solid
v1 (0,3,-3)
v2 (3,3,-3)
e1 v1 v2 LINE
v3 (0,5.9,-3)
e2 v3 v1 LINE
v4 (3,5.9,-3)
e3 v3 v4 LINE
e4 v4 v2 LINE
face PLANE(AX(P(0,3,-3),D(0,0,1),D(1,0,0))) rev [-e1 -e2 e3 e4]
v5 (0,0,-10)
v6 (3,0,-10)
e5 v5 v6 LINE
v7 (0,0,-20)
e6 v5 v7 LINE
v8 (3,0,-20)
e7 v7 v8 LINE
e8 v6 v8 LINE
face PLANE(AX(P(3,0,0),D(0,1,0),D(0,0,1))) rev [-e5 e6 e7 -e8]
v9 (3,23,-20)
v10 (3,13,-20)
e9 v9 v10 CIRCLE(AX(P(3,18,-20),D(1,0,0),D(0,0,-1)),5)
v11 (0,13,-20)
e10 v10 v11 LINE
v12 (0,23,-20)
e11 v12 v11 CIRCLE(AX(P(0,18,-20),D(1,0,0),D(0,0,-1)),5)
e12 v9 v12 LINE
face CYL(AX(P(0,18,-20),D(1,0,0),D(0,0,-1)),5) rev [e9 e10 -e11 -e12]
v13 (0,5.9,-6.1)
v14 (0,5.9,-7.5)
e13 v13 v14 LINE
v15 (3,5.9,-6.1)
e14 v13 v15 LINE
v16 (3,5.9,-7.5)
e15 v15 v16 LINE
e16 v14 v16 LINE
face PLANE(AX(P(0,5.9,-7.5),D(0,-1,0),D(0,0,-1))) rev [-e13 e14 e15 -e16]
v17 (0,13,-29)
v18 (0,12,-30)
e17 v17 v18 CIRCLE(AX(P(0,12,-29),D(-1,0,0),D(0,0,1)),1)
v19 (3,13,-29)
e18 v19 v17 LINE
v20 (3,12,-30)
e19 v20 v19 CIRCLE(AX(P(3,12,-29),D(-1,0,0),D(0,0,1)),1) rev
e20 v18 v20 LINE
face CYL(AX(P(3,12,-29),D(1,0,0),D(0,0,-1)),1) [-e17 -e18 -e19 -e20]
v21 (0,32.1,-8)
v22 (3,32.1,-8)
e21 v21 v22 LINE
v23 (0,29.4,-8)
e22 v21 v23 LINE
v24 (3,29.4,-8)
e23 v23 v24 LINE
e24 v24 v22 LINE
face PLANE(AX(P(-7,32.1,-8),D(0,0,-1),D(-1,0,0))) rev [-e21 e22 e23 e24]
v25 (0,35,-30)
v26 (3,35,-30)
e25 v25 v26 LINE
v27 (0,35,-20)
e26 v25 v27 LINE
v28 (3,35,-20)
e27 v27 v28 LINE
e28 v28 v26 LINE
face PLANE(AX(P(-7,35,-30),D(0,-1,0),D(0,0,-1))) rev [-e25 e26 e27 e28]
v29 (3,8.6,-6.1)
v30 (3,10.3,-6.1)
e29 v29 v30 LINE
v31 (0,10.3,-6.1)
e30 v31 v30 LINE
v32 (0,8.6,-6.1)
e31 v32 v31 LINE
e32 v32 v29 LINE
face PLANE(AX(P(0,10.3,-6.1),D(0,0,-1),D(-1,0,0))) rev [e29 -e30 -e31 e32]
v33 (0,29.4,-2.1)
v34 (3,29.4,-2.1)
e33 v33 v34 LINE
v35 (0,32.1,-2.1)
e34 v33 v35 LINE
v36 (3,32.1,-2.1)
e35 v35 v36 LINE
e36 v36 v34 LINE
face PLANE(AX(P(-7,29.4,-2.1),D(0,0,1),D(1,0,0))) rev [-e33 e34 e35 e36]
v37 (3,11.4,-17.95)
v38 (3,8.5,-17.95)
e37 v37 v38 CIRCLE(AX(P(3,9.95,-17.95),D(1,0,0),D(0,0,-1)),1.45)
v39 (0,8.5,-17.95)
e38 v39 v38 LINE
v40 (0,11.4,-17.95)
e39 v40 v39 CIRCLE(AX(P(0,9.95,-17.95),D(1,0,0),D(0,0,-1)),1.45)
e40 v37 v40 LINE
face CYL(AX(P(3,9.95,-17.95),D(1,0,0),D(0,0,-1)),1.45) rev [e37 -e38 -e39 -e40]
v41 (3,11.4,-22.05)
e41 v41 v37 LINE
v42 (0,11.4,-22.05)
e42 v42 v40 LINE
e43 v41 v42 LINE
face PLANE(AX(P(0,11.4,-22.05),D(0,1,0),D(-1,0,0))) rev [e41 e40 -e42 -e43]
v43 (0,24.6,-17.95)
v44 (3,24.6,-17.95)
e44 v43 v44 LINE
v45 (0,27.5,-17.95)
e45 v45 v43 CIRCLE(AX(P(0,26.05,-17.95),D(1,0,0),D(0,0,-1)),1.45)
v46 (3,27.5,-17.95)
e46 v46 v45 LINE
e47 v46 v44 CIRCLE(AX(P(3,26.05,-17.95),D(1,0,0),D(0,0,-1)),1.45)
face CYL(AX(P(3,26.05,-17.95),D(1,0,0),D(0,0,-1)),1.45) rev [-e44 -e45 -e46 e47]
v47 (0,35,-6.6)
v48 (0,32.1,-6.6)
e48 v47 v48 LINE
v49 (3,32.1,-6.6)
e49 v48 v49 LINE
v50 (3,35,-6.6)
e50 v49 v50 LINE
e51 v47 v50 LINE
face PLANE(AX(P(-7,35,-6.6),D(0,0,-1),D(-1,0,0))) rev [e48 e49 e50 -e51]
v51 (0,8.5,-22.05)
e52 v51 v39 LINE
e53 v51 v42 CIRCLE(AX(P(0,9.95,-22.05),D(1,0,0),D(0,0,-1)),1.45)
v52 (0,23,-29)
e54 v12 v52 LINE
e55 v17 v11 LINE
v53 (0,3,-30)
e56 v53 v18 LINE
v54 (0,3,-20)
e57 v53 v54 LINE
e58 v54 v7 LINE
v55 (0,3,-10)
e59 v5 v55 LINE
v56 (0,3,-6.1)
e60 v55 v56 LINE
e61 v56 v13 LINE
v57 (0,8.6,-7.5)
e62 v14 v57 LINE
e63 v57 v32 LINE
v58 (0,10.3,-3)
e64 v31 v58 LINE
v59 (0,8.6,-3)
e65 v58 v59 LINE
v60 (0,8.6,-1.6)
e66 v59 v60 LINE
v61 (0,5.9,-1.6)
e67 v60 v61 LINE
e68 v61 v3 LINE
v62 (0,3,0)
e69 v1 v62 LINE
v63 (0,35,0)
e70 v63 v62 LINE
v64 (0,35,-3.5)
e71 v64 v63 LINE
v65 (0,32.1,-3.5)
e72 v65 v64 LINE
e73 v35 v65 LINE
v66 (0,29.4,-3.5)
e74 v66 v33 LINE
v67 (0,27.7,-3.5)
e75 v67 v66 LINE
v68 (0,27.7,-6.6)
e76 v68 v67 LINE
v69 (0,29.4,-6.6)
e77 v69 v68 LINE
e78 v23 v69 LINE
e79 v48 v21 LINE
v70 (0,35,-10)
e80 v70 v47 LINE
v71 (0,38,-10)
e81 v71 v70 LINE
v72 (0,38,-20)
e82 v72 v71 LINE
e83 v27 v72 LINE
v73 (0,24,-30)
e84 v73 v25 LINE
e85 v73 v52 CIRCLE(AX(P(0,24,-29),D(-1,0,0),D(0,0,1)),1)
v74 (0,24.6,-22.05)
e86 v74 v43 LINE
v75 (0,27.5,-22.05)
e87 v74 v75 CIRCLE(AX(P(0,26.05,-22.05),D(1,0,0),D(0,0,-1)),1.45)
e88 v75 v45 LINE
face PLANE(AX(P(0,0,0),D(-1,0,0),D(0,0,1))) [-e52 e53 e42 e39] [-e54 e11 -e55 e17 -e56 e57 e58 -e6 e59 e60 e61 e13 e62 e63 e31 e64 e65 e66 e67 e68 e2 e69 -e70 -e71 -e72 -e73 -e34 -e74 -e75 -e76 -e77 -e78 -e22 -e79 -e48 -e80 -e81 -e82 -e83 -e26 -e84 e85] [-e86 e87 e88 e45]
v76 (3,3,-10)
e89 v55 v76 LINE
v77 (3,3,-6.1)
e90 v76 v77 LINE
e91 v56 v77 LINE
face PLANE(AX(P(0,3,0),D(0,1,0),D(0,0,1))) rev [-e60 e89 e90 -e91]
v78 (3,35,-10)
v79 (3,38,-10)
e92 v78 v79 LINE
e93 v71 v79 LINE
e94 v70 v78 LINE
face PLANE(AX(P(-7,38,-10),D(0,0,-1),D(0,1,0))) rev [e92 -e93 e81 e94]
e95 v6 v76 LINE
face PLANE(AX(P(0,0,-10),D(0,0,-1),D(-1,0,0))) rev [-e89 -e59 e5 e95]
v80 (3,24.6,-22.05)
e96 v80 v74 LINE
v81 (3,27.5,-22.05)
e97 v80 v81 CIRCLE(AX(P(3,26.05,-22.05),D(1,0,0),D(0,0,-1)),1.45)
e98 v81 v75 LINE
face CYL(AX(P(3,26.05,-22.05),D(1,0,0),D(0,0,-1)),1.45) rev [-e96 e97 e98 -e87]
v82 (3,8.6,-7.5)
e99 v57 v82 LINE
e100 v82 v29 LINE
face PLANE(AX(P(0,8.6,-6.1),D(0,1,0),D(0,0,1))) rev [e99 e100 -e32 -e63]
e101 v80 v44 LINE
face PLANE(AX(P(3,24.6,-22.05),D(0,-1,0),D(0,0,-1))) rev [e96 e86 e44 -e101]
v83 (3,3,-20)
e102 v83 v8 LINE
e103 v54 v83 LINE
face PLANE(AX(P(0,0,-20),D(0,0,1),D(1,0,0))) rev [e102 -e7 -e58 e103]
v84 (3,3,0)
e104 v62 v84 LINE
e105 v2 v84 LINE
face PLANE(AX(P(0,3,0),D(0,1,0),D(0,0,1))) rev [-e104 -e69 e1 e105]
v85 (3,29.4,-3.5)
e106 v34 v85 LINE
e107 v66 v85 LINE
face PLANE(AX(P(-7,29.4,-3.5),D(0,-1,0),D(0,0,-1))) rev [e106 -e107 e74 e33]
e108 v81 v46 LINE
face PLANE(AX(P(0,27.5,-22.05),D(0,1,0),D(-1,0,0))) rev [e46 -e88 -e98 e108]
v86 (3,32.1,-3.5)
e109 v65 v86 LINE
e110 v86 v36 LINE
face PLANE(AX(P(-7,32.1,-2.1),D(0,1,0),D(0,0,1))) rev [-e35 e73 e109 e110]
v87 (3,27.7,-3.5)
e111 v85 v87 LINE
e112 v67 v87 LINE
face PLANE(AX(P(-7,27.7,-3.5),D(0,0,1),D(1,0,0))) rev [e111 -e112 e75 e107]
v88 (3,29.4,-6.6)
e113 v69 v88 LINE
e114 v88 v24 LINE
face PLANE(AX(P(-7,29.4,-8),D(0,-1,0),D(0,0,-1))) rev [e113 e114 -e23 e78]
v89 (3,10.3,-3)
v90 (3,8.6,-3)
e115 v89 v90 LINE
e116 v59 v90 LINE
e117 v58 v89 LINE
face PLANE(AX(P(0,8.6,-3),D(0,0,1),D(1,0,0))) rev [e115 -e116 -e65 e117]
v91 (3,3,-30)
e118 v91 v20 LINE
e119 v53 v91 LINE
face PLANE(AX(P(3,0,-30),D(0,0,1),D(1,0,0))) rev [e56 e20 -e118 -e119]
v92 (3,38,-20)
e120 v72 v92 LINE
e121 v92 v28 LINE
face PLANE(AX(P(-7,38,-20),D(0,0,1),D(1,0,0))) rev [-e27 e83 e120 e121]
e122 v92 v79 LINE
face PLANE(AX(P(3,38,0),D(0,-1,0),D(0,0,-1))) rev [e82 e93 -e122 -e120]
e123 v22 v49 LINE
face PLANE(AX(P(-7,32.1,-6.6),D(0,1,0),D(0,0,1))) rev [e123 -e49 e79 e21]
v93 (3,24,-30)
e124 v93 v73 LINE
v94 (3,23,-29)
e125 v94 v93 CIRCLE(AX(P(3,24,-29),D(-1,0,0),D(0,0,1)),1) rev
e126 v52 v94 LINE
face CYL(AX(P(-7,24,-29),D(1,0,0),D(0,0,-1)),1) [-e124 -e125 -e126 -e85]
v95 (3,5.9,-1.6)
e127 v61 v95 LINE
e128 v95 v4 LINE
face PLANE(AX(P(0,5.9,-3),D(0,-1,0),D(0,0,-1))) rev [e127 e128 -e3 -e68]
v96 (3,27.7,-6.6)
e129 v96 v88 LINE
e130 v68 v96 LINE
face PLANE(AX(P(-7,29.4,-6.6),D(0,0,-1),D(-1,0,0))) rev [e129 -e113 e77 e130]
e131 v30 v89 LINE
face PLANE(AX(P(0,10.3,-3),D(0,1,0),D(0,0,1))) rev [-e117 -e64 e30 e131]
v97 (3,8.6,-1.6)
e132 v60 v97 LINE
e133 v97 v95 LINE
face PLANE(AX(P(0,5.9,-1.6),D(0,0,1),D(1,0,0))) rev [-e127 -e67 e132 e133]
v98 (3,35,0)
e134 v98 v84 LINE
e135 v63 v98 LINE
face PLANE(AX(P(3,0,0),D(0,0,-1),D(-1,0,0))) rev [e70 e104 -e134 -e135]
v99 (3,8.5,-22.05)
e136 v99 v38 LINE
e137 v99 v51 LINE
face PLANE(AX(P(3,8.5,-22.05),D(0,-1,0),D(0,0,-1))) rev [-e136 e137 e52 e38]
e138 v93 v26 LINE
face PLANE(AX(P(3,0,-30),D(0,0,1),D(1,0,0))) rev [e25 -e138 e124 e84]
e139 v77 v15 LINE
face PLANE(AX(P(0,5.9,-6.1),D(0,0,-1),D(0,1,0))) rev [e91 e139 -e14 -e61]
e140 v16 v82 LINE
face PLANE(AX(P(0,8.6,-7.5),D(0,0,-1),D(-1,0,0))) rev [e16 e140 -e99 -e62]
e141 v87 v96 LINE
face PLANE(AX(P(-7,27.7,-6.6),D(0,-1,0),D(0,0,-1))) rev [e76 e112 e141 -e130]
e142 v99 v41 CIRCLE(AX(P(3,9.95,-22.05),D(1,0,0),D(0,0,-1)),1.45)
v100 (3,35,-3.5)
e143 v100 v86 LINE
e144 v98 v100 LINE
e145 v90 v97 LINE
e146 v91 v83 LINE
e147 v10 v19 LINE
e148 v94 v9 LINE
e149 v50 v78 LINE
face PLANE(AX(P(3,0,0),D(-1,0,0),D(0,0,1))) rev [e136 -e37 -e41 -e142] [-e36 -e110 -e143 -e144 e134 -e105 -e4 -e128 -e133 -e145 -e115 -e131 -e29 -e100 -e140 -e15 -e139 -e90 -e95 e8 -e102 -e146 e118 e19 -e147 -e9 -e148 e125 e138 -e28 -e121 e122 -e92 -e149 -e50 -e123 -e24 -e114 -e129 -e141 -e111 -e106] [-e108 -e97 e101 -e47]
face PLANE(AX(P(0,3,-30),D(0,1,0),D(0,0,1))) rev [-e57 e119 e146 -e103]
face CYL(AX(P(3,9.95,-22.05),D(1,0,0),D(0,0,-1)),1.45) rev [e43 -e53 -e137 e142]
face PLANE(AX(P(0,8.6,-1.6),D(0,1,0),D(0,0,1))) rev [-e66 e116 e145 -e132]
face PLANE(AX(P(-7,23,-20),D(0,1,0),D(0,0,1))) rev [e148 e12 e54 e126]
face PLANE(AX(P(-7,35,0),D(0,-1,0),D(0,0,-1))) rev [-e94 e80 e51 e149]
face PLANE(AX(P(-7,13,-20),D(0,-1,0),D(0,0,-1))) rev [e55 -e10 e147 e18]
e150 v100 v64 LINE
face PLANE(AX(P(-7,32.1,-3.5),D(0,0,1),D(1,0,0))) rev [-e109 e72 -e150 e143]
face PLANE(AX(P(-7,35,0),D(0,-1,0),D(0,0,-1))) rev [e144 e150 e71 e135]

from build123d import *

# Parameters (mm, degrees)
SKETCH1_W                  = 30
SKETCH1_H                  = 38
BOSS_EXTRUDE1_DEPTH        = 3
SKETCH2_R                  = 5
CUT_EXTRUDE1_DEPTH         = 3
SKETCH6_W                  = 10
SKETCH6_H                  = 3
CUT_EXTRUDE2_DEPTH         = 3
CUT_EXTRUDE3_DEPTH         = 3
SKETCH9_W                  = 10
SKETCH9_H                  = 3
CUT_EXTRUDE5_DEPTH         = 10
CUT_EXTRUDE6_DEPTH         = 10
M2_5_CLEARANCE_SLOT1_DEPTH = 3
SKETCH17_W                 = 10
SKETCH17_H                 = 10
CUT_EXTRUDE7_DEPTH         = 10
FILLET1_R                  = 1


# Read off the part's stored shape, not the designer's step: M2.5 Clearance Slot1
with BuildPart() as part:
    # Sketch1 → Boss-Extrude1 (new body)
    with BuildSketch(Plane(origin=(0, 0, 0), x_dir=(0, 0, -1), z_dir=(1, 0, 0))):
        with Locations((15, 19)):
            Rectangle(SKETCH1_W, SKETCH1_H)
    extrude(amount=BOSS_EXTRUDE1_DEPTH)

    # Sketch2 → Cut-Extrude1 (cut)
    with BuildSketch(Plane(origin=(3, 0, 0), x_dir=(0, 0, -1), z_dir=(1, 0, 0))):
        with Locations((20, 18)):
            Circle(SKETCH2_R)
    extrude(amount=-CUT_EXTRUDE1_DEPTH, mode=Mode.SUBTRACT)

    # Sketch6 → Cut-Extrude2 (cut)
    with BuildSketch(Plane(origin=(3, 0, 0), x_dir=(0, 0, -1), z_dir=(1, 0, 0))):
        with Locations((5, 1.5)):
            Rectangle(SKETCH6_W, SKETCH6_H)
        with Locations((25, 1.5)):
            Rectangle(SKETCH6_W, SKETCH6_H)
    extrude(amount=-CUT_EXTRUDE2_DEPTH, mode=Mode.SUBTRACT)

    # Sketch7 → Cut-Extrude3 (cut)
    with BuildSketch(Plane(origin=(3, 0, 0), x_dir=(0, 0, -1), z_dir=(1, 0, 0))):
        Polygon((3, 3), (3, 5.9), (1.6, 5.9), (1.6, 8.6), (3, 8.6), (3, 10.3), (6.1, 10.3), (6.1, 8.6), (7.5, 8.6), (7.5, 5.9), (6.1, 5.9), (6.1, 3), align=None)
    extrude(amount=-CUT_EXTRUDE3_DEPTH, mode=Mode.SUBTRACT)

    # Sketch9 → Cut-Extrude5 (cut)
    with BuildSketch(Plane(origin=(3, 0, 0), x_dir=(0, 0, -1), z_dir=(1, 0, 0))):
        with Locations((5, 36.5)):
            Rectangle(SKETCH9_W, SKETCH9_H)
        with Locations((25, 36.5)):
            Rectangle(SKETCH9_W, SKETCH9_H)
    extrude(amount=-CUT_EXTRUDE5_DEPTH, mode=Mode.SUBTRACT)

    # Sketch12 → Cut-Extrude6 (cut)
    with BuildSketch(Plane(origin=(3, 0, 0), x_dir=(0, 0, -1), z_dir=(1, 0, 0))):
        Polygon((6.6, 35), (6.6, 32.1), (8, 32.1), (8, 29.4), (6.6, 29.4), (6.6, 27.7), (3.5, 27.7), (3.5, 29.4), (2.1, 29.4), (2.1, 32.1), (3.5, 32.1), (3.5, 35), align=None)
    extrude(amount=-CUT_EXTRUDE6_DEPTH, mode=Mode.SUBTRACT)

    # M2.5 Clearance Slot1 outline → M2.5 Clearance Slot1 (cut)
    with BuildSketch(Plane.YZ):
        with BuildLine():
            Line((11.4, -22.05), (11.4, -17.95))
            ThreePointArc((11.4, -17.95), (9.95, -16.5), (8.5, -17.95))
            Line((8.5, -17.95), (8.5, -22.05))
            ThreePointArc((8.5, -22.05), (9.95, -23.5), (11.4, -22.05))
        make_face()
        with BuildLine():
            Line((27.5, -22.05), (27.5, -17.95))
            ThreePointArc((27.5, -17.95), (26.05, -16.5), (24.6, -17.95))
            Line((24.6, -17.95), (24.6, -22.05))
            ThreePointArc((24.6, -22.05), (26.05, -23.5), (27.5, -22.05))
        make_face()
    extrude(amount=M2_5_CLEARANCE_SLOT1_DEPTH, mode=Mode.SUBTRACT)

    # Sketch17 → Cut-Extrude7 (cut)
    with BuildSketch(Plane(origin=(3, 0, 0), x_dir=(0, 0, -1), z_dir=(1, 0, 0))):
        with Locations((25, 18)):
            Rectangle(SKETCH17_W, SKETCH17_H)
    extrude(amount=-CUT_EXTRUDE7_DEPTH, mode=Mode.SUBTRACT)

    # Fillet1
    fillet1_edges = [part.edges().sort_by_distance(p)[0] for p in [
        (1.5, 23, -30),
        (1.5, 13, -30),
    ]]
    fillet(fillet1_edges, radius=FILLET1_R)


solid = part.part
